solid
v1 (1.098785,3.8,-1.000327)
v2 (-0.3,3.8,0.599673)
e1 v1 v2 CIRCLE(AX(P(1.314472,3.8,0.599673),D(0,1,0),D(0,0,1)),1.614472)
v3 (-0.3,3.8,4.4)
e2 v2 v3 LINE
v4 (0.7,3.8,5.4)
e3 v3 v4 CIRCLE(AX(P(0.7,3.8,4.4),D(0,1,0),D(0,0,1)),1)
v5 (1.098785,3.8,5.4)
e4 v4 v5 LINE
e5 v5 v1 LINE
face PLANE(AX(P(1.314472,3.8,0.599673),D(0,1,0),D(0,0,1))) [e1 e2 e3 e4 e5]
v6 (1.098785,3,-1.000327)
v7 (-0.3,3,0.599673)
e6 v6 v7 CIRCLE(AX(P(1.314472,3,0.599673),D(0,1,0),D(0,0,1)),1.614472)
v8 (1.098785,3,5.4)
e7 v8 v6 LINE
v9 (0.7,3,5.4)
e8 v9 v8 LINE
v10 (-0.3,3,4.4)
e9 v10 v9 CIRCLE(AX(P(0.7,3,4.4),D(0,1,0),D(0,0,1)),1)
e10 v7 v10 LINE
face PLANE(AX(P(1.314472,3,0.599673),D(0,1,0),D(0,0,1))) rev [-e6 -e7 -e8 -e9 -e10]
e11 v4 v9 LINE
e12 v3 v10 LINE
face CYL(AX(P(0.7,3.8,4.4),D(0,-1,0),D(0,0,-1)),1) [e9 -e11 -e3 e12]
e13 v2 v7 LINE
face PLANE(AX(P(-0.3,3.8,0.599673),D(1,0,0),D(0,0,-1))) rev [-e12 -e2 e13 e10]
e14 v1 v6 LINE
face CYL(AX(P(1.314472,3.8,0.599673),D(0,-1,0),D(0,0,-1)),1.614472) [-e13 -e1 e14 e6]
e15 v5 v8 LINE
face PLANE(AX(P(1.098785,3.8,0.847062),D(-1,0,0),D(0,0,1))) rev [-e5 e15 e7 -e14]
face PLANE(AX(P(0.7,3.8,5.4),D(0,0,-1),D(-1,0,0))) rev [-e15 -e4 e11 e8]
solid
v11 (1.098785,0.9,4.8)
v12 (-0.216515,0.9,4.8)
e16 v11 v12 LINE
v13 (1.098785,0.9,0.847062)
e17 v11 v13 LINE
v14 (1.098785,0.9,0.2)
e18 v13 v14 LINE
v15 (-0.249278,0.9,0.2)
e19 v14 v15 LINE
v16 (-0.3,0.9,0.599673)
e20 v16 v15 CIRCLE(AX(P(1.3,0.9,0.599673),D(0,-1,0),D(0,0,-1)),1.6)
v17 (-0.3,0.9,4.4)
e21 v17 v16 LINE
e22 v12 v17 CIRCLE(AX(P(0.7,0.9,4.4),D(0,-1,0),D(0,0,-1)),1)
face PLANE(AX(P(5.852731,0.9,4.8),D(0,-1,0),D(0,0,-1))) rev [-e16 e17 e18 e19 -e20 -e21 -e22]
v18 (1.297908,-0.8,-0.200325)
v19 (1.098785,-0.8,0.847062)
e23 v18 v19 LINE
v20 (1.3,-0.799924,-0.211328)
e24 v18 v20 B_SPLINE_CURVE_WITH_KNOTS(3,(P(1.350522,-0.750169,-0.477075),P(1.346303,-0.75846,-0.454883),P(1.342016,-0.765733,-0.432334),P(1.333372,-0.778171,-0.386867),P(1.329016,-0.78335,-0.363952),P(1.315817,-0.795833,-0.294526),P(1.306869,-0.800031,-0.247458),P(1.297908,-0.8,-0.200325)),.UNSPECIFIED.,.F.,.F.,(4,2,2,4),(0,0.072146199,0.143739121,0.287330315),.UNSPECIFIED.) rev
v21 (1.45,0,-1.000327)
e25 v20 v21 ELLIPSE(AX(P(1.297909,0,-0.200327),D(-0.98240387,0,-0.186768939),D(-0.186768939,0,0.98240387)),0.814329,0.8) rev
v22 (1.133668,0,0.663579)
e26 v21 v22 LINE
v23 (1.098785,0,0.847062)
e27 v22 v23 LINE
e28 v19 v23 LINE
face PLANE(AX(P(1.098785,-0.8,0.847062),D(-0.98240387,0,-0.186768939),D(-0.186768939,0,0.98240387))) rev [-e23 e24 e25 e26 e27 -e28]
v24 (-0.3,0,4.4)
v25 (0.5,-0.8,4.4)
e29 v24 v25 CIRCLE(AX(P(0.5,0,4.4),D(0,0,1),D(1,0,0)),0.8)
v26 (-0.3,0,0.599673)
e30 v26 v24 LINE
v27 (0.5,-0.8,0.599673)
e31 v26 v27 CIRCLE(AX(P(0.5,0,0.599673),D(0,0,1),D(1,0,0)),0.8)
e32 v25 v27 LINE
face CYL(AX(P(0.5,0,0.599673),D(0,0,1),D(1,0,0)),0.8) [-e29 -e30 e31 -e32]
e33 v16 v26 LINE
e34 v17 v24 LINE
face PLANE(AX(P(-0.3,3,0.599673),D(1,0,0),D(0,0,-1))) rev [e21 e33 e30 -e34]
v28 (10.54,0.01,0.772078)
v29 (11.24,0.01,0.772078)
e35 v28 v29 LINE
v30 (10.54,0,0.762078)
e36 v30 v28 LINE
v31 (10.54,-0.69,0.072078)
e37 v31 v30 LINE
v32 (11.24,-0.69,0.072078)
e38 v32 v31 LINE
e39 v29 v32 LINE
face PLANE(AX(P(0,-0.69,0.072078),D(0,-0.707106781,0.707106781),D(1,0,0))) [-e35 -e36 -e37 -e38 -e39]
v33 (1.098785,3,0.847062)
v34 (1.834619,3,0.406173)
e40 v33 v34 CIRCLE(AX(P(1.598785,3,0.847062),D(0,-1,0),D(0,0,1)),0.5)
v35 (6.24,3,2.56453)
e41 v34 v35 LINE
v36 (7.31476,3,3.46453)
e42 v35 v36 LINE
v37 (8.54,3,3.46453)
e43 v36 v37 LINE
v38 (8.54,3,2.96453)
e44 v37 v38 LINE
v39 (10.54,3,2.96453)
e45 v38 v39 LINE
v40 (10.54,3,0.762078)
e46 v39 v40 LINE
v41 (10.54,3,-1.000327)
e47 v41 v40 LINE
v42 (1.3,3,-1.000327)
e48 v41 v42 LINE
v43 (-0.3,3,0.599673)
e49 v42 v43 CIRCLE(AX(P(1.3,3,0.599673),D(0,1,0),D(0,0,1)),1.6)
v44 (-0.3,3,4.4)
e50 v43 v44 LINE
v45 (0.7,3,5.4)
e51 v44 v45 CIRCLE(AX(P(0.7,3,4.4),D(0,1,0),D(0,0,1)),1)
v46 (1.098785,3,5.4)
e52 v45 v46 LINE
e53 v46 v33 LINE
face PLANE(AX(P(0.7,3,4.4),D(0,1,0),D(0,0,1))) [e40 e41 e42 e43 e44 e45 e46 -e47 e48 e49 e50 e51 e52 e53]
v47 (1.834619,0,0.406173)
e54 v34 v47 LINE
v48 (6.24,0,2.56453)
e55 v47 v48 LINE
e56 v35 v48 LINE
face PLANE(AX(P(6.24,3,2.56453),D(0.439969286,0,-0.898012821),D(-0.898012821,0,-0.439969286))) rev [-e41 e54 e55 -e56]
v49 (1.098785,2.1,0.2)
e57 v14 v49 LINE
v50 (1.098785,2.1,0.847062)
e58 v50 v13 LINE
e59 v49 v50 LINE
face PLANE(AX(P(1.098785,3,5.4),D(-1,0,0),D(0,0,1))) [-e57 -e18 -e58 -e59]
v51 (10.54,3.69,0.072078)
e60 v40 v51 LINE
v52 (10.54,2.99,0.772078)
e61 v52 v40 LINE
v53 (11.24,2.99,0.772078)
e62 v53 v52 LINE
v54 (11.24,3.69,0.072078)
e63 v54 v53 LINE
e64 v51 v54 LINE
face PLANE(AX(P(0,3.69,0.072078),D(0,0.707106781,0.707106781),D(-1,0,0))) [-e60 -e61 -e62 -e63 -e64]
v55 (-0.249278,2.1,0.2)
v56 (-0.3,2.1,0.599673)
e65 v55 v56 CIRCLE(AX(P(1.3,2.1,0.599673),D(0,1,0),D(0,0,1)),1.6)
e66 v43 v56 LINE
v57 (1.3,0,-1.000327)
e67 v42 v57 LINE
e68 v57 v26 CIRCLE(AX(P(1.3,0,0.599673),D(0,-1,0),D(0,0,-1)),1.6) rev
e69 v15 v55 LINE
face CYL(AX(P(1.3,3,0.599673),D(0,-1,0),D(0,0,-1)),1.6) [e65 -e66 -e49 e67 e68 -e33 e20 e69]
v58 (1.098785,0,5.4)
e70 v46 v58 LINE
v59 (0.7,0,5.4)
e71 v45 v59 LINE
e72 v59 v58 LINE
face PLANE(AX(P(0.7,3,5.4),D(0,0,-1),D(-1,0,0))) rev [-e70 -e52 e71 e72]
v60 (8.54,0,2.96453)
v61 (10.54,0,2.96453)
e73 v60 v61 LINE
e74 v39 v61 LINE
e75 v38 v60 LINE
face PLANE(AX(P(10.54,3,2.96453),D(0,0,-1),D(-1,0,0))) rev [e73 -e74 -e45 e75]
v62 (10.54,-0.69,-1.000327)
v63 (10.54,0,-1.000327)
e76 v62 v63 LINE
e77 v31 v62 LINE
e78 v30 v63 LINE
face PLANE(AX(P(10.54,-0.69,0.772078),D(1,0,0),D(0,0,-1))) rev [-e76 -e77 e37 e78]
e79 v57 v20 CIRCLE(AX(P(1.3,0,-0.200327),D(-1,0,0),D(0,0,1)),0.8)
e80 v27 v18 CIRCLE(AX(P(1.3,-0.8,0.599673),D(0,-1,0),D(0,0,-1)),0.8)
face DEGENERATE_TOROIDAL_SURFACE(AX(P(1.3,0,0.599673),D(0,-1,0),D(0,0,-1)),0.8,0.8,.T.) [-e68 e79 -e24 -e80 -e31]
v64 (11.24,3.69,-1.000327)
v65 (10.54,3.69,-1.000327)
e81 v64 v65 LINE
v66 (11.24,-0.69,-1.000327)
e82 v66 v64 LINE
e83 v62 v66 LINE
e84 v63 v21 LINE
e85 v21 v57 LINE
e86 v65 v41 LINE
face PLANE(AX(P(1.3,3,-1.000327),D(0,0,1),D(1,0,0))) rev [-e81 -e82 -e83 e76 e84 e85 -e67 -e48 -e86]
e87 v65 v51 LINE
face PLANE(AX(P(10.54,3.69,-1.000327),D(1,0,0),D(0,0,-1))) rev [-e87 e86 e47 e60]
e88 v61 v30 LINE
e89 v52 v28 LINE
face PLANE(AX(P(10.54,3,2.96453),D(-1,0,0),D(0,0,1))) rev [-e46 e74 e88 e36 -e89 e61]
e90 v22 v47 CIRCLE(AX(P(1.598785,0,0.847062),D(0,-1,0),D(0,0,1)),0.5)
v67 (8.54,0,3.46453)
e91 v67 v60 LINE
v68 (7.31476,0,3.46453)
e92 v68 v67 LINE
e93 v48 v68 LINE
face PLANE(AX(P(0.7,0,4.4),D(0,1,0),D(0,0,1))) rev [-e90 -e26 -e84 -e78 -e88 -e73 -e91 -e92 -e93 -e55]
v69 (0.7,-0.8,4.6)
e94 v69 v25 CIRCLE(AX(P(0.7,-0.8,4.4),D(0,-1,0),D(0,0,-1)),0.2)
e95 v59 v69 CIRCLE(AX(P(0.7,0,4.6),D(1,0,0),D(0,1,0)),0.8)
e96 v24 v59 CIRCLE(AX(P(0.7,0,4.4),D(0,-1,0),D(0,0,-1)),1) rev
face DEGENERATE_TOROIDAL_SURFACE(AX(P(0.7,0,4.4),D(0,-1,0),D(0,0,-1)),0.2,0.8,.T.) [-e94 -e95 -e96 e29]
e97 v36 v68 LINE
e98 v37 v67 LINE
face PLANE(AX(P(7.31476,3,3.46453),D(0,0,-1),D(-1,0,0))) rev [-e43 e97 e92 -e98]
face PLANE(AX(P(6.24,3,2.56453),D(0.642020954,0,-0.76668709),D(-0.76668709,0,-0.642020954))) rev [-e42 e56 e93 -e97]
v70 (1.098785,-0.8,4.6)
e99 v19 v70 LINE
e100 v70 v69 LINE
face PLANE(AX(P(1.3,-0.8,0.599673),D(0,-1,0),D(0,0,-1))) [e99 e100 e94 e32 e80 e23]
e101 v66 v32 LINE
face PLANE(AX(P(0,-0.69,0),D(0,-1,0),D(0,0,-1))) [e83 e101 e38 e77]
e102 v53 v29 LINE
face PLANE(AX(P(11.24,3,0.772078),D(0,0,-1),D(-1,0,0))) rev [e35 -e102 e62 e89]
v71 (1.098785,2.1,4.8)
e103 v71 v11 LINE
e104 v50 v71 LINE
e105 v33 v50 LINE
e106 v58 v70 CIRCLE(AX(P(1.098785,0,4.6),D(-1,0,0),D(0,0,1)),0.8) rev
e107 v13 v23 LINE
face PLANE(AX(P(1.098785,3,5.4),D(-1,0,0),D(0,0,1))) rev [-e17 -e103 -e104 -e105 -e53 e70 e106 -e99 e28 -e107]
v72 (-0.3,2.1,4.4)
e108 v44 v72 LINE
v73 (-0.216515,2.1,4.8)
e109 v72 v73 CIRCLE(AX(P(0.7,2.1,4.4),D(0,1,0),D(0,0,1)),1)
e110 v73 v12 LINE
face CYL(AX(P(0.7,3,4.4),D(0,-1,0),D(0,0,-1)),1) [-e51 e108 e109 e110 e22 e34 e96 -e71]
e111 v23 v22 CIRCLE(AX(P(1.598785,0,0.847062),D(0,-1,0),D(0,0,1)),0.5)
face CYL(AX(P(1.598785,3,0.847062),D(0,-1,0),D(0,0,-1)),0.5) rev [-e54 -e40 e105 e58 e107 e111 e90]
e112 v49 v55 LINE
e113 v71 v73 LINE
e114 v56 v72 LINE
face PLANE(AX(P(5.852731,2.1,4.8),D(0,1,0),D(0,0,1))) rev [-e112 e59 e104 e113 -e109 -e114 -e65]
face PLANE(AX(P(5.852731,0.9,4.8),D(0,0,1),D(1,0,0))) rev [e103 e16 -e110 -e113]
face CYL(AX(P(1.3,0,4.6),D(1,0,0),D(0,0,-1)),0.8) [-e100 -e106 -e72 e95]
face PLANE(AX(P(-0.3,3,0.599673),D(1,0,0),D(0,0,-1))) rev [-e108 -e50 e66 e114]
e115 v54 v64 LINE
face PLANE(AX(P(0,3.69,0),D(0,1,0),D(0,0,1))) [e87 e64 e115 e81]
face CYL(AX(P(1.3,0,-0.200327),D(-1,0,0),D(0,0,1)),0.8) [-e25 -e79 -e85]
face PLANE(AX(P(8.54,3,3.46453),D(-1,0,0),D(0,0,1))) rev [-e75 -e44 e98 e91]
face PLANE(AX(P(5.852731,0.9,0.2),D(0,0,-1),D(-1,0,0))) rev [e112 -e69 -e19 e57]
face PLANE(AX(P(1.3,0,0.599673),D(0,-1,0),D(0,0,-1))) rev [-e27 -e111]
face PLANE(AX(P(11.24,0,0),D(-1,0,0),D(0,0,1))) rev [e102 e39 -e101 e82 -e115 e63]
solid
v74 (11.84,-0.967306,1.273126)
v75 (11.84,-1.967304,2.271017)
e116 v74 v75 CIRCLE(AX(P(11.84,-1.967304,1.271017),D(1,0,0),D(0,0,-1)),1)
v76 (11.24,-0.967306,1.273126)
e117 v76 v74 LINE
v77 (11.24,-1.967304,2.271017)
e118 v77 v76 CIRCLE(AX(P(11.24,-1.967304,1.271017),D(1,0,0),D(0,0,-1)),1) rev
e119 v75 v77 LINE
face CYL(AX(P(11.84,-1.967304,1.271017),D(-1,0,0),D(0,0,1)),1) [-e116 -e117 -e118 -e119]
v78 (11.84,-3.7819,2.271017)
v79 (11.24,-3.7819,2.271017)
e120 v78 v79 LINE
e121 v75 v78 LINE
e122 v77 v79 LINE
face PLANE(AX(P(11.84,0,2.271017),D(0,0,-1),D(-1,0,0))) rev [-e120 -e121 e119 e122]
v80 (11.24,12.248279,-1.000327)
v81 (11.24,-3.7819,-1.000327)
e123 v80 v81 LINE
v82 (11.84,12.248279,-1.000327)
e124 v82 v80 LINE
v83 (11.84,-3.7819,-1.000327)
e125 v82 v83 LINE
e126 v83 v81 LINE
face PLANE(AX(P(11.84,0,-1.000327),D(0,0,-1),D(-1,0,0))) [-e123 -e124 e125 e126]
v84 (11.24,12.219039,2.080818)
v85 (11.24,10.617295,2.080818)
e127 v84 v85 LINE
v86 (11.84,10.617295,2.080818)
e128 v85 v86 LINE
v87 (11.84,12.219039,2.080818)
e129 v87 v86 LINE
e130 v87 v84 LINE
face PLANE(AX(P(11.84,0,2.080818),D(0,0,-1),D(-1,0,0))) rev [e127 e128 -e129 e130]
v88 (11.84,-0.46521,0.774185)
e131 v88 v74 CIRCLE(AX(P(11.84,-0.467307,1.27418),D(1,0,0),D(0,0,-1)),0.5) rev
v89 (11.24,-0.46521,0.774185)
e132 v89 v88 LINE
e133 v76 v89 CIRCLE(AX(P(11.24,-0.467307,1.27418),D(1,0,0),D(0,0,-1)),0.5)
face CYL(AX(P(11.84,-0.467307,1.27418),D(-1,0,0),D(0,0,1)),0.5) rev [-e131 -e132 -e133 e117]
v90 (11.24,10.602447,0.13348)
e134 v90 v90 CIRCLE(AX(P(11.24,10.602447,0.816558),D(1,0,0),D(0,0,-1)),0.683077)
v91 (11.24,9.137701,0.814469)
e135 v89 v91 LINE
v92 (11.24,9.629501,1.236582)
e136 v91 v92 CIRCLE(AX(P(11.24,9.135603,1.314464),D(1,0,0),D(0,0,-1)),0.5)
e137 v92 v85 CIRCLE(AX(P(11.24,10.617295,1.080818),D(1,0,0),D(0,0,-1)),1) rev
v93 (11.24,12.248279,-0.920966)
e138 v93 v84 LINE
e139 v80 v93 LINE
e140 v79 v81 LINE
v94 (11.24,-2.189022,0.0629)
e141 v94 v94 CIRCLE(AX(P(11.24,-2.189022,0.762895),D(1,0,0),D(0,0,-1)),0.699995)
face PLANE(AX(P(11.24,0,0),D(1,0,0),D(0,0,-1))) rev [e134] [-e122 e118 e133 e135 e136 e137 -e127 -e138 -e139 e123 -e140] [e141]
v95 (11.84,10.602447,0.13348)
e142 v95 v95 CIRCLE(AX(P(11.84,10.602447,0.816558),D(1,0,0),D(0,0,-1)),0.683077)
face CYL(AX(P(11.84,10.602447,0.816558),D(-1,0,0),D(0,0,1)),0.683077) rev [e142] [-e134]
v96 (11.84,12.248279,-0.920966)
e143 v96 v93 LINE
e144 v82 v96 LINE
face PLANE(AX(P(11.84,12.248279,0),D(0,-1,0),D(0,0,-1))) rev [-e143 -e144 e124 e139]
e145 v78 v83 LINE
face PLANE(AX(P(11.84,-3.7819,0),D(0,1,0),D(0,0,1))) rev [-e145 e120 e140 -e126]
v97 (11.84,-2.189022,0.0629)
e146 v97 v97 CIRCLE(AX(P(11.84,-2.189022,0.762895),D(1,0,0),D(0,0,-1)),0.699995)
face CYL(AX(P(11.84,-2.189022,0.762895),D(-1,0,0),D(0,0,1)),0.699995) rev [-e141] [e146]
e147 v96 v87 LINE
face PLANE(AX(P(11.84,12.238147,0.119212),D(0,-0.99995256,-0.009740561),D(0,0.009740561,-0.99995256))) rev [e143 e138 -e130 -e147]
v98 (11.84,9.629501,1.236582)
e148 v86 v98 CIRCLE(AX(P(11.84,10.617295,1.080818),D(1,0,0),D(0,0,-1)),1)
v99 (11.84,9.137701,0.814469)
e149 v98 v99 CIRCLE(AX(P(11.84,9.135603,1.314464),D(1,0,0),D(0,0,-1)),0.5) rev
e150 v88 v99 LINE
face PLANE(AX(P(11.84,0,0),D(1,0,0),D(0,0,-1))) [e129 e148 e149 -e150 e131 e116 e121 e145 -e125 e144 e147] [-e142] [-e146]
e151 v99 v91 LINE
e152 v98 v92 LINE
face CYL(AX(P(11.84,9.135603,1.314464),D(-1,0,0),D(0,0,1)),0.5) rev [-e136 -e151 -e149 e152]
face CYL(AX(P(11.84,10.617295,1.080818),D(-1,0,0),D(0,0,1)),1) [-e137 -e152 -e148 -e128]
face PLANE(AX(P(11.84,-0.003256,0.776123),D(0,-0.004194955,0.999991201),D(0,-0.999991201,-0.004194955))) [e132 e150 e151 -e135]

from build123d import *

# Parameters (mm, degrees)
BOSS_EXTRUDE5_DEPTH  = 3
SKETCH13_W           = 4.6
SKETCH13_H           = 1.2
CUT_EXTRUDE5_DEPTH   = 1.398785094
SKETCH14_W           = 1.772405836
SKETCH14_H           = 3
BOSS_EXTRUDE6_DEPTH  = 0.7
BOSS_EXTRUDE7_START  = 0.8
BOSS_EXTRUDE7_DEPTH  = 0.8
BOSS_EXTRUDE8_DEPTH  = 0.8
SKETCH17_W           = 0.7
SKETCH17_H           = 1.772405836
BOSS_EXTRUDE9_DEPTH  = 0.69
SKETCH18_W           = 0.7
SKETCH18_H           = 1.772405836
BOSS_EXTRUDE10_DEPTH = 0.69
CHAMFER1_SIZE        = 0.7
FILLET7_R            = 0.8
SKETCH19_R           = 0.699995293
SKETCH19_R_2         = 0.683077483
BOSS_EXTRUDE11_DEPTH = 0.6
FILLET9_R            = 0.5
FILLET10_R           = 1


with BuildPart() as part:
    # Sketch12 → Boss-Extrude5 (new body)
    with BuildSketch(Plane(origin=(0, 0, 0), x_dir=(1, 0, 0), z_dir=(0, 1, 0))):
        with BuildLine():
            Line((0.7, -5.4), (1.098785094, -5.4))
            Line((1.098785094, -5.4), (1.098785094, -0.847061546))
            ThreePointArc((1.098785094, -0.847061546), (1.341799578, -0.418157775), (1.834618872, -0.406173319))
            Line((1.834618872, -0.406173319), (6.24, -2.564530465))
            Line((6.24, -2.564530465), (7.314759908, -3.464530465))
            Line((7.314759908, -3.464530465), (8.54, -3.464530465))
            Line((8.54, -3.464530465), (8.54, -2.964530465))
            Line((8.54, -2.964530465), (10.54, -2.964530465))
            Line((10.54, -2.964530465), (10.54, 1.000327451))
            Line((10.54, 1.000327451), (1.6, 1.000327451))
            Line((1.6, 1.000327451), (1.3, 1.000327451))
            ThreePointArc((1.3, 1.000327451), (0.16862915, 0.531698301), (-0.3, -0.599672549))
            Line((-0.3, -0.599672549), (-0.3, -4.4))
            ThreePointArc((-0.3, -4.4), (-0.007106781, -5.107106781), (0.7, -5.4))
        make_face()
    extrude(amount=BOSS_EXTRUDE5_DEPTH)

    # Sketch13 → Cut-Extrude5 (cut)
    with BuildSketch(Plane.ZY.offset(0.3)):
        with Locations((2.5, 1.5)):
            Rectangle(SKETCH13_W, SKETCH13_H)
    extrude(amount=-CUT_EXTRUDE5_DEPTH, mode=Mode.SUBTRACT)

    # Sketch14 → Boss-Extrude6 (add)
    with BuildSketch(Plane(origin=(10.54, 0, 0), x_dir=(0, 0, -1), z_dir=(1, 0, 0))):
        with Locations((0.114124533, 1.5)):
            Rectangle(SKETCH14_W, SKETCH14_H)
    extrude(amount=BOSS_EXTRUDE6_DEPTH)

    # Sketch15 → Boss-Extrude7 (add)
    with BuildSketch(Plane.XZ.offset(BOSS_EXTRUDE7_START)):
        with BuildLine():
            Line((-0.3, 0.599672549), (-0.3, 4.4))
            ThreePointArc((-0.3, 4.4), (-0.007106781, 5.107106781), (0.7, 5.4))
            Line((0.7, 5.4), (1.098785094, 5.4))
            Line((1.098785094, 5.4), (1.098785094, 0.847061546))
            Line((1.098785094, 0.847061546), (1.45, -1.000327451))
            Line((1.45, -1.000327451), (1.3, -1.000327451))
            ThreePointArc((1.3, -1.000327451), (0.16862915, -0.531698301), (-0.3, 0.599672549))
        make_face()
    extrude(amount=-BOSS_EXTRUDE7_DEPTH)

    # Sketch17 → Boss-Extrude9 (add)
    with BuildSketch(Plane(origin=(0, 3, 0), x_dir=(1, 0, 0), z_dir=(0, 1, 0))):
        with Locations((10.89, 0.114124533)):
            Rectangle(SKETCH17_W, SKETCH17_H)
    extrude(amount=BOSS_EXTRUDE9_DEPTH)

    # Sketch18 → Boss-Extrude10 (add)
    with BuildSketch(Plane.XZ):
        with Locations((10.89, -0.114124533)):
            Rectangle(SKETCH18_W, SKETCH18_H)
    extrude(amount=BOSS_EXTRUDE10_DEPTH)

    # Chamfer1
    # the kernel refuses this chamfer: 0.7 mm, written as the material it takes off along each edge
    with BuildSketch(Plane(origin=(13.040178092, 3.69, 0.772078385), x_dir=(0, -0.9996219169112968, 0.027495876610586445), z_dir=(-1, 0, 0))) as chamfer1_piece_1:
        Polygon((CHAMFER1_SIZE * 0.999621916911, -CHAMFER1_SIZE * 0.0274958766106), (-CHAMFER1_SIZE * 0.0274958766106, -CHAMFER1_SIZE * 0.999621916911), (0, 0), align=None)
    extrude(amount=2.500178092, mode=Mode.SUBTRACT)
    with BuildSketch(Plane(origin=(13.040178092, -0.69, 0.772078385), x_dir=(0, 0.9996219169112968, 0.027495876610586438), z_dir=(-1, 0, 0))) as chamfer1_piece_2:
        Polygon((CHAMFER1_SIZE * 0.999621916911, CHAMFER1_SIZE * 0.0274958766106), (-CHAMFER1_SIZE * 0.0274958766106, CHAMFER1_SIZE * 0.999621916911), (0, 0), align=None)
    extrude(amount=2.500178092, mode=Mode.SUBTRACT)

    # Fillet7
    # the kernel refuses this fillet: 0.8 mm, written as the material it takes off along each edge
    with BuildSketch(Plane(origin=(0.7, -0.8, 5.4), x_dir=(0, 0, -1), z_dir=(1, 0, 0))) as fillet7_piece_1:
        with BuildLine():
            CenterArc((FILLET7_R, FILLET7_R), FILLET7_R, 180, 90)
            Line((0, FILLET7_R), (0, 0))
            Line((0, 0), (FILLET7_R, 0))
        make_face()
    extrude(amount=2.398785094, mode=Mode.SUBTRACT)
    with BuildSketch(Plane(origin=(3.45, -0.8, -1.000327451), x_dir=(0, 0, 1), z_dir=(-1, 0, 0))) as fillet7_piece_2:
        with BuildLine():
            CenterArc((FILLET7_R, FILLET7_R), FILLET7_R, 180, 90)
            Line((0, FILLET7_R), (0, 0))
            Line((0, 0), (FILLET7_R, 0))
        make_face()
    extrude(amount=2.15, mode=Mode.SUBTRACT)
    with BuildSketch(Plane(origin=(1.3, -0.8, 0.599672549), x_dir=(0, 0, -1), z_dir=(1, 0, 0))) as fillet7_piece_3:
        with BuildLine():
            CenterArc((1.6 - FILLET7_R, FILLET7_R), FILLET7_R, 270, 90)
            Line((1.6, FILLET7_R), (1.6, 0))
            Line((1.6, 0), (1.6 - FILLET7_R, 0))
        make_face()
    revolve(axis=Axis((1.3, -0.8, 0.599672549), (0, 1, 0)), revolution_arc=90, mode=Mode.SUBTRACT)
    with BuildSketch(Plane(origin=(-0.3, -0.8, 0.599672549), x_dir=(1, 0, 0), z_dir=(0, 0, 1))) as fillet7_piece_4:
        with BuildLine():
            CenterArc((FILLET7_R, FILLET7_R), FILLET7_R, 180, 90)
            Line((0, FILLET7_R), (0, 0))
            Line((0, 0), (FILLET7_R, 0))
        make_face()
    extrude(amount=3.800327451, mode=Mode.SUBTRACT)
    with BuildSketch(Plane(origin=(0.7, -0.8, 4.4), x_dir=(-1, 0, 0), z_dir=(0, 0, -1))) as fillet7_piece_5:
        with BuildLine():
            CenterArc((1 - FILLET7_R, FILLET7_R), FILLET7_R, 270, 90)
            Line((1, FILLET7_R), (1, 0))
            Line((1, 0), (1 - FILLET7_R, 0))
        make_face()
    revolve(axis=Axis((0.7, -0.8, 4.4), (0, 1, 0)), revolution_arc=90, mode=Mode.SUBTRACT)


with BuildPart() as body_2:
    # Sketch16 → Boss-Extrude8 (new body)
    with BuildSketch(Plane(origin=(0, 3, 0), x_dir=(1, 0, 0), z_dir=(0, 1, 0))):
        with BuildLine():
            Line((1.098785094, -5.4), (1.098785094, -0.847061546))
            Line((1.098785094, -0.847061546), (1.098785094, 1.000327451))
            ThreePointArc((1.098785094, 1.000327451), (0.09900082, 0.46294212), (-0.3, -0.599672549))
            Line((-0.3, -0.599672549), (-0.3, -4.4))
            ThreePointArc((-0.3, -4.4), (-0.007106781, -5.107106781), (0.7, -5.4))
            Line((0.7, -5.4), (1.098785094, -5.4))
        make_face()
    extrude(amount=BOSS_EXTRUDE8_DEPTH)


with BuildPart() as body_3:
    # Sketch19 → Boss-Extrude11 (new body)
    # profile 1 of 2: a face of its own
    with BuildSketch(Plane(origin=(11.24, 0, 0), x_dir=(0, 0, -1), z_dir=(1, 0, 0))):
        Polygon((1.000327451, 12.248278955), (0.920966212, 12.248278955), (-2.080817644, 12.219038508), (-2.080817644, 9.635603478), (-0.816557514, 9.635603478), (-0.772078385, -0.967307084), (-2.271016584, -0.967307084), (-2.271016584, -3.781900205), (1.000327451, -3.781900205), (1.000327451, -0.69), (-0.072078385, -0.69), (-0.772078385, 0.01), (-0.772078385, 2.99), (-0.072078385, 3.69), (1.000327451, 3.69), align=None)
        with Locations((-0.762895052, -2.189022372)):
            Circle(SKETCH19_R, mode=Mode.SUBTRACT)
        with Locations((-0.816557514, 10.602447151)):
            Circle(SKETCH19_R_2, mode=Mode.SUBTRACT)
    # profile 2 of 2: a face of its own
    with BuildSketch(Plane(origin=(11.24, 0, 0), x_dir=(0, 0, -1), z_dir=(1, 0, 0))):
        Polygon((1.000327451, -0.69), (1.000327451, 3.69), (-0.072078385, 3.69), (-0.772078385, 2.99), (-0.772078385, 0.01), (-0.072078385, -0.69), align=None)
    extrude(amount=BOSS_EXTRUDE11_DEPTH)

    # Fillet9
    fillet9_edges = [body_3.edges().sort_by_distance(p)[0] for p in [
        (11.54, -0.967307084, 0.772078385),
        (11.54, 9.635603478, 0.816557514),
    ]]
    fillet(fillet9_edges, radius=FILLET9_R)

    # Fillet10
    fillet10_edges = [body_3.edges().sort_by_distance(p)[0] for p in [
        (11.54, -0.967307084, 2.271016584),
        (11.54, 9.635603478, 2.080817644),
    ]]
    fillet(fillet10_edges, radius=FILLET10_R)


solid = Compound([part.part, body_2.part, body_3.part])
